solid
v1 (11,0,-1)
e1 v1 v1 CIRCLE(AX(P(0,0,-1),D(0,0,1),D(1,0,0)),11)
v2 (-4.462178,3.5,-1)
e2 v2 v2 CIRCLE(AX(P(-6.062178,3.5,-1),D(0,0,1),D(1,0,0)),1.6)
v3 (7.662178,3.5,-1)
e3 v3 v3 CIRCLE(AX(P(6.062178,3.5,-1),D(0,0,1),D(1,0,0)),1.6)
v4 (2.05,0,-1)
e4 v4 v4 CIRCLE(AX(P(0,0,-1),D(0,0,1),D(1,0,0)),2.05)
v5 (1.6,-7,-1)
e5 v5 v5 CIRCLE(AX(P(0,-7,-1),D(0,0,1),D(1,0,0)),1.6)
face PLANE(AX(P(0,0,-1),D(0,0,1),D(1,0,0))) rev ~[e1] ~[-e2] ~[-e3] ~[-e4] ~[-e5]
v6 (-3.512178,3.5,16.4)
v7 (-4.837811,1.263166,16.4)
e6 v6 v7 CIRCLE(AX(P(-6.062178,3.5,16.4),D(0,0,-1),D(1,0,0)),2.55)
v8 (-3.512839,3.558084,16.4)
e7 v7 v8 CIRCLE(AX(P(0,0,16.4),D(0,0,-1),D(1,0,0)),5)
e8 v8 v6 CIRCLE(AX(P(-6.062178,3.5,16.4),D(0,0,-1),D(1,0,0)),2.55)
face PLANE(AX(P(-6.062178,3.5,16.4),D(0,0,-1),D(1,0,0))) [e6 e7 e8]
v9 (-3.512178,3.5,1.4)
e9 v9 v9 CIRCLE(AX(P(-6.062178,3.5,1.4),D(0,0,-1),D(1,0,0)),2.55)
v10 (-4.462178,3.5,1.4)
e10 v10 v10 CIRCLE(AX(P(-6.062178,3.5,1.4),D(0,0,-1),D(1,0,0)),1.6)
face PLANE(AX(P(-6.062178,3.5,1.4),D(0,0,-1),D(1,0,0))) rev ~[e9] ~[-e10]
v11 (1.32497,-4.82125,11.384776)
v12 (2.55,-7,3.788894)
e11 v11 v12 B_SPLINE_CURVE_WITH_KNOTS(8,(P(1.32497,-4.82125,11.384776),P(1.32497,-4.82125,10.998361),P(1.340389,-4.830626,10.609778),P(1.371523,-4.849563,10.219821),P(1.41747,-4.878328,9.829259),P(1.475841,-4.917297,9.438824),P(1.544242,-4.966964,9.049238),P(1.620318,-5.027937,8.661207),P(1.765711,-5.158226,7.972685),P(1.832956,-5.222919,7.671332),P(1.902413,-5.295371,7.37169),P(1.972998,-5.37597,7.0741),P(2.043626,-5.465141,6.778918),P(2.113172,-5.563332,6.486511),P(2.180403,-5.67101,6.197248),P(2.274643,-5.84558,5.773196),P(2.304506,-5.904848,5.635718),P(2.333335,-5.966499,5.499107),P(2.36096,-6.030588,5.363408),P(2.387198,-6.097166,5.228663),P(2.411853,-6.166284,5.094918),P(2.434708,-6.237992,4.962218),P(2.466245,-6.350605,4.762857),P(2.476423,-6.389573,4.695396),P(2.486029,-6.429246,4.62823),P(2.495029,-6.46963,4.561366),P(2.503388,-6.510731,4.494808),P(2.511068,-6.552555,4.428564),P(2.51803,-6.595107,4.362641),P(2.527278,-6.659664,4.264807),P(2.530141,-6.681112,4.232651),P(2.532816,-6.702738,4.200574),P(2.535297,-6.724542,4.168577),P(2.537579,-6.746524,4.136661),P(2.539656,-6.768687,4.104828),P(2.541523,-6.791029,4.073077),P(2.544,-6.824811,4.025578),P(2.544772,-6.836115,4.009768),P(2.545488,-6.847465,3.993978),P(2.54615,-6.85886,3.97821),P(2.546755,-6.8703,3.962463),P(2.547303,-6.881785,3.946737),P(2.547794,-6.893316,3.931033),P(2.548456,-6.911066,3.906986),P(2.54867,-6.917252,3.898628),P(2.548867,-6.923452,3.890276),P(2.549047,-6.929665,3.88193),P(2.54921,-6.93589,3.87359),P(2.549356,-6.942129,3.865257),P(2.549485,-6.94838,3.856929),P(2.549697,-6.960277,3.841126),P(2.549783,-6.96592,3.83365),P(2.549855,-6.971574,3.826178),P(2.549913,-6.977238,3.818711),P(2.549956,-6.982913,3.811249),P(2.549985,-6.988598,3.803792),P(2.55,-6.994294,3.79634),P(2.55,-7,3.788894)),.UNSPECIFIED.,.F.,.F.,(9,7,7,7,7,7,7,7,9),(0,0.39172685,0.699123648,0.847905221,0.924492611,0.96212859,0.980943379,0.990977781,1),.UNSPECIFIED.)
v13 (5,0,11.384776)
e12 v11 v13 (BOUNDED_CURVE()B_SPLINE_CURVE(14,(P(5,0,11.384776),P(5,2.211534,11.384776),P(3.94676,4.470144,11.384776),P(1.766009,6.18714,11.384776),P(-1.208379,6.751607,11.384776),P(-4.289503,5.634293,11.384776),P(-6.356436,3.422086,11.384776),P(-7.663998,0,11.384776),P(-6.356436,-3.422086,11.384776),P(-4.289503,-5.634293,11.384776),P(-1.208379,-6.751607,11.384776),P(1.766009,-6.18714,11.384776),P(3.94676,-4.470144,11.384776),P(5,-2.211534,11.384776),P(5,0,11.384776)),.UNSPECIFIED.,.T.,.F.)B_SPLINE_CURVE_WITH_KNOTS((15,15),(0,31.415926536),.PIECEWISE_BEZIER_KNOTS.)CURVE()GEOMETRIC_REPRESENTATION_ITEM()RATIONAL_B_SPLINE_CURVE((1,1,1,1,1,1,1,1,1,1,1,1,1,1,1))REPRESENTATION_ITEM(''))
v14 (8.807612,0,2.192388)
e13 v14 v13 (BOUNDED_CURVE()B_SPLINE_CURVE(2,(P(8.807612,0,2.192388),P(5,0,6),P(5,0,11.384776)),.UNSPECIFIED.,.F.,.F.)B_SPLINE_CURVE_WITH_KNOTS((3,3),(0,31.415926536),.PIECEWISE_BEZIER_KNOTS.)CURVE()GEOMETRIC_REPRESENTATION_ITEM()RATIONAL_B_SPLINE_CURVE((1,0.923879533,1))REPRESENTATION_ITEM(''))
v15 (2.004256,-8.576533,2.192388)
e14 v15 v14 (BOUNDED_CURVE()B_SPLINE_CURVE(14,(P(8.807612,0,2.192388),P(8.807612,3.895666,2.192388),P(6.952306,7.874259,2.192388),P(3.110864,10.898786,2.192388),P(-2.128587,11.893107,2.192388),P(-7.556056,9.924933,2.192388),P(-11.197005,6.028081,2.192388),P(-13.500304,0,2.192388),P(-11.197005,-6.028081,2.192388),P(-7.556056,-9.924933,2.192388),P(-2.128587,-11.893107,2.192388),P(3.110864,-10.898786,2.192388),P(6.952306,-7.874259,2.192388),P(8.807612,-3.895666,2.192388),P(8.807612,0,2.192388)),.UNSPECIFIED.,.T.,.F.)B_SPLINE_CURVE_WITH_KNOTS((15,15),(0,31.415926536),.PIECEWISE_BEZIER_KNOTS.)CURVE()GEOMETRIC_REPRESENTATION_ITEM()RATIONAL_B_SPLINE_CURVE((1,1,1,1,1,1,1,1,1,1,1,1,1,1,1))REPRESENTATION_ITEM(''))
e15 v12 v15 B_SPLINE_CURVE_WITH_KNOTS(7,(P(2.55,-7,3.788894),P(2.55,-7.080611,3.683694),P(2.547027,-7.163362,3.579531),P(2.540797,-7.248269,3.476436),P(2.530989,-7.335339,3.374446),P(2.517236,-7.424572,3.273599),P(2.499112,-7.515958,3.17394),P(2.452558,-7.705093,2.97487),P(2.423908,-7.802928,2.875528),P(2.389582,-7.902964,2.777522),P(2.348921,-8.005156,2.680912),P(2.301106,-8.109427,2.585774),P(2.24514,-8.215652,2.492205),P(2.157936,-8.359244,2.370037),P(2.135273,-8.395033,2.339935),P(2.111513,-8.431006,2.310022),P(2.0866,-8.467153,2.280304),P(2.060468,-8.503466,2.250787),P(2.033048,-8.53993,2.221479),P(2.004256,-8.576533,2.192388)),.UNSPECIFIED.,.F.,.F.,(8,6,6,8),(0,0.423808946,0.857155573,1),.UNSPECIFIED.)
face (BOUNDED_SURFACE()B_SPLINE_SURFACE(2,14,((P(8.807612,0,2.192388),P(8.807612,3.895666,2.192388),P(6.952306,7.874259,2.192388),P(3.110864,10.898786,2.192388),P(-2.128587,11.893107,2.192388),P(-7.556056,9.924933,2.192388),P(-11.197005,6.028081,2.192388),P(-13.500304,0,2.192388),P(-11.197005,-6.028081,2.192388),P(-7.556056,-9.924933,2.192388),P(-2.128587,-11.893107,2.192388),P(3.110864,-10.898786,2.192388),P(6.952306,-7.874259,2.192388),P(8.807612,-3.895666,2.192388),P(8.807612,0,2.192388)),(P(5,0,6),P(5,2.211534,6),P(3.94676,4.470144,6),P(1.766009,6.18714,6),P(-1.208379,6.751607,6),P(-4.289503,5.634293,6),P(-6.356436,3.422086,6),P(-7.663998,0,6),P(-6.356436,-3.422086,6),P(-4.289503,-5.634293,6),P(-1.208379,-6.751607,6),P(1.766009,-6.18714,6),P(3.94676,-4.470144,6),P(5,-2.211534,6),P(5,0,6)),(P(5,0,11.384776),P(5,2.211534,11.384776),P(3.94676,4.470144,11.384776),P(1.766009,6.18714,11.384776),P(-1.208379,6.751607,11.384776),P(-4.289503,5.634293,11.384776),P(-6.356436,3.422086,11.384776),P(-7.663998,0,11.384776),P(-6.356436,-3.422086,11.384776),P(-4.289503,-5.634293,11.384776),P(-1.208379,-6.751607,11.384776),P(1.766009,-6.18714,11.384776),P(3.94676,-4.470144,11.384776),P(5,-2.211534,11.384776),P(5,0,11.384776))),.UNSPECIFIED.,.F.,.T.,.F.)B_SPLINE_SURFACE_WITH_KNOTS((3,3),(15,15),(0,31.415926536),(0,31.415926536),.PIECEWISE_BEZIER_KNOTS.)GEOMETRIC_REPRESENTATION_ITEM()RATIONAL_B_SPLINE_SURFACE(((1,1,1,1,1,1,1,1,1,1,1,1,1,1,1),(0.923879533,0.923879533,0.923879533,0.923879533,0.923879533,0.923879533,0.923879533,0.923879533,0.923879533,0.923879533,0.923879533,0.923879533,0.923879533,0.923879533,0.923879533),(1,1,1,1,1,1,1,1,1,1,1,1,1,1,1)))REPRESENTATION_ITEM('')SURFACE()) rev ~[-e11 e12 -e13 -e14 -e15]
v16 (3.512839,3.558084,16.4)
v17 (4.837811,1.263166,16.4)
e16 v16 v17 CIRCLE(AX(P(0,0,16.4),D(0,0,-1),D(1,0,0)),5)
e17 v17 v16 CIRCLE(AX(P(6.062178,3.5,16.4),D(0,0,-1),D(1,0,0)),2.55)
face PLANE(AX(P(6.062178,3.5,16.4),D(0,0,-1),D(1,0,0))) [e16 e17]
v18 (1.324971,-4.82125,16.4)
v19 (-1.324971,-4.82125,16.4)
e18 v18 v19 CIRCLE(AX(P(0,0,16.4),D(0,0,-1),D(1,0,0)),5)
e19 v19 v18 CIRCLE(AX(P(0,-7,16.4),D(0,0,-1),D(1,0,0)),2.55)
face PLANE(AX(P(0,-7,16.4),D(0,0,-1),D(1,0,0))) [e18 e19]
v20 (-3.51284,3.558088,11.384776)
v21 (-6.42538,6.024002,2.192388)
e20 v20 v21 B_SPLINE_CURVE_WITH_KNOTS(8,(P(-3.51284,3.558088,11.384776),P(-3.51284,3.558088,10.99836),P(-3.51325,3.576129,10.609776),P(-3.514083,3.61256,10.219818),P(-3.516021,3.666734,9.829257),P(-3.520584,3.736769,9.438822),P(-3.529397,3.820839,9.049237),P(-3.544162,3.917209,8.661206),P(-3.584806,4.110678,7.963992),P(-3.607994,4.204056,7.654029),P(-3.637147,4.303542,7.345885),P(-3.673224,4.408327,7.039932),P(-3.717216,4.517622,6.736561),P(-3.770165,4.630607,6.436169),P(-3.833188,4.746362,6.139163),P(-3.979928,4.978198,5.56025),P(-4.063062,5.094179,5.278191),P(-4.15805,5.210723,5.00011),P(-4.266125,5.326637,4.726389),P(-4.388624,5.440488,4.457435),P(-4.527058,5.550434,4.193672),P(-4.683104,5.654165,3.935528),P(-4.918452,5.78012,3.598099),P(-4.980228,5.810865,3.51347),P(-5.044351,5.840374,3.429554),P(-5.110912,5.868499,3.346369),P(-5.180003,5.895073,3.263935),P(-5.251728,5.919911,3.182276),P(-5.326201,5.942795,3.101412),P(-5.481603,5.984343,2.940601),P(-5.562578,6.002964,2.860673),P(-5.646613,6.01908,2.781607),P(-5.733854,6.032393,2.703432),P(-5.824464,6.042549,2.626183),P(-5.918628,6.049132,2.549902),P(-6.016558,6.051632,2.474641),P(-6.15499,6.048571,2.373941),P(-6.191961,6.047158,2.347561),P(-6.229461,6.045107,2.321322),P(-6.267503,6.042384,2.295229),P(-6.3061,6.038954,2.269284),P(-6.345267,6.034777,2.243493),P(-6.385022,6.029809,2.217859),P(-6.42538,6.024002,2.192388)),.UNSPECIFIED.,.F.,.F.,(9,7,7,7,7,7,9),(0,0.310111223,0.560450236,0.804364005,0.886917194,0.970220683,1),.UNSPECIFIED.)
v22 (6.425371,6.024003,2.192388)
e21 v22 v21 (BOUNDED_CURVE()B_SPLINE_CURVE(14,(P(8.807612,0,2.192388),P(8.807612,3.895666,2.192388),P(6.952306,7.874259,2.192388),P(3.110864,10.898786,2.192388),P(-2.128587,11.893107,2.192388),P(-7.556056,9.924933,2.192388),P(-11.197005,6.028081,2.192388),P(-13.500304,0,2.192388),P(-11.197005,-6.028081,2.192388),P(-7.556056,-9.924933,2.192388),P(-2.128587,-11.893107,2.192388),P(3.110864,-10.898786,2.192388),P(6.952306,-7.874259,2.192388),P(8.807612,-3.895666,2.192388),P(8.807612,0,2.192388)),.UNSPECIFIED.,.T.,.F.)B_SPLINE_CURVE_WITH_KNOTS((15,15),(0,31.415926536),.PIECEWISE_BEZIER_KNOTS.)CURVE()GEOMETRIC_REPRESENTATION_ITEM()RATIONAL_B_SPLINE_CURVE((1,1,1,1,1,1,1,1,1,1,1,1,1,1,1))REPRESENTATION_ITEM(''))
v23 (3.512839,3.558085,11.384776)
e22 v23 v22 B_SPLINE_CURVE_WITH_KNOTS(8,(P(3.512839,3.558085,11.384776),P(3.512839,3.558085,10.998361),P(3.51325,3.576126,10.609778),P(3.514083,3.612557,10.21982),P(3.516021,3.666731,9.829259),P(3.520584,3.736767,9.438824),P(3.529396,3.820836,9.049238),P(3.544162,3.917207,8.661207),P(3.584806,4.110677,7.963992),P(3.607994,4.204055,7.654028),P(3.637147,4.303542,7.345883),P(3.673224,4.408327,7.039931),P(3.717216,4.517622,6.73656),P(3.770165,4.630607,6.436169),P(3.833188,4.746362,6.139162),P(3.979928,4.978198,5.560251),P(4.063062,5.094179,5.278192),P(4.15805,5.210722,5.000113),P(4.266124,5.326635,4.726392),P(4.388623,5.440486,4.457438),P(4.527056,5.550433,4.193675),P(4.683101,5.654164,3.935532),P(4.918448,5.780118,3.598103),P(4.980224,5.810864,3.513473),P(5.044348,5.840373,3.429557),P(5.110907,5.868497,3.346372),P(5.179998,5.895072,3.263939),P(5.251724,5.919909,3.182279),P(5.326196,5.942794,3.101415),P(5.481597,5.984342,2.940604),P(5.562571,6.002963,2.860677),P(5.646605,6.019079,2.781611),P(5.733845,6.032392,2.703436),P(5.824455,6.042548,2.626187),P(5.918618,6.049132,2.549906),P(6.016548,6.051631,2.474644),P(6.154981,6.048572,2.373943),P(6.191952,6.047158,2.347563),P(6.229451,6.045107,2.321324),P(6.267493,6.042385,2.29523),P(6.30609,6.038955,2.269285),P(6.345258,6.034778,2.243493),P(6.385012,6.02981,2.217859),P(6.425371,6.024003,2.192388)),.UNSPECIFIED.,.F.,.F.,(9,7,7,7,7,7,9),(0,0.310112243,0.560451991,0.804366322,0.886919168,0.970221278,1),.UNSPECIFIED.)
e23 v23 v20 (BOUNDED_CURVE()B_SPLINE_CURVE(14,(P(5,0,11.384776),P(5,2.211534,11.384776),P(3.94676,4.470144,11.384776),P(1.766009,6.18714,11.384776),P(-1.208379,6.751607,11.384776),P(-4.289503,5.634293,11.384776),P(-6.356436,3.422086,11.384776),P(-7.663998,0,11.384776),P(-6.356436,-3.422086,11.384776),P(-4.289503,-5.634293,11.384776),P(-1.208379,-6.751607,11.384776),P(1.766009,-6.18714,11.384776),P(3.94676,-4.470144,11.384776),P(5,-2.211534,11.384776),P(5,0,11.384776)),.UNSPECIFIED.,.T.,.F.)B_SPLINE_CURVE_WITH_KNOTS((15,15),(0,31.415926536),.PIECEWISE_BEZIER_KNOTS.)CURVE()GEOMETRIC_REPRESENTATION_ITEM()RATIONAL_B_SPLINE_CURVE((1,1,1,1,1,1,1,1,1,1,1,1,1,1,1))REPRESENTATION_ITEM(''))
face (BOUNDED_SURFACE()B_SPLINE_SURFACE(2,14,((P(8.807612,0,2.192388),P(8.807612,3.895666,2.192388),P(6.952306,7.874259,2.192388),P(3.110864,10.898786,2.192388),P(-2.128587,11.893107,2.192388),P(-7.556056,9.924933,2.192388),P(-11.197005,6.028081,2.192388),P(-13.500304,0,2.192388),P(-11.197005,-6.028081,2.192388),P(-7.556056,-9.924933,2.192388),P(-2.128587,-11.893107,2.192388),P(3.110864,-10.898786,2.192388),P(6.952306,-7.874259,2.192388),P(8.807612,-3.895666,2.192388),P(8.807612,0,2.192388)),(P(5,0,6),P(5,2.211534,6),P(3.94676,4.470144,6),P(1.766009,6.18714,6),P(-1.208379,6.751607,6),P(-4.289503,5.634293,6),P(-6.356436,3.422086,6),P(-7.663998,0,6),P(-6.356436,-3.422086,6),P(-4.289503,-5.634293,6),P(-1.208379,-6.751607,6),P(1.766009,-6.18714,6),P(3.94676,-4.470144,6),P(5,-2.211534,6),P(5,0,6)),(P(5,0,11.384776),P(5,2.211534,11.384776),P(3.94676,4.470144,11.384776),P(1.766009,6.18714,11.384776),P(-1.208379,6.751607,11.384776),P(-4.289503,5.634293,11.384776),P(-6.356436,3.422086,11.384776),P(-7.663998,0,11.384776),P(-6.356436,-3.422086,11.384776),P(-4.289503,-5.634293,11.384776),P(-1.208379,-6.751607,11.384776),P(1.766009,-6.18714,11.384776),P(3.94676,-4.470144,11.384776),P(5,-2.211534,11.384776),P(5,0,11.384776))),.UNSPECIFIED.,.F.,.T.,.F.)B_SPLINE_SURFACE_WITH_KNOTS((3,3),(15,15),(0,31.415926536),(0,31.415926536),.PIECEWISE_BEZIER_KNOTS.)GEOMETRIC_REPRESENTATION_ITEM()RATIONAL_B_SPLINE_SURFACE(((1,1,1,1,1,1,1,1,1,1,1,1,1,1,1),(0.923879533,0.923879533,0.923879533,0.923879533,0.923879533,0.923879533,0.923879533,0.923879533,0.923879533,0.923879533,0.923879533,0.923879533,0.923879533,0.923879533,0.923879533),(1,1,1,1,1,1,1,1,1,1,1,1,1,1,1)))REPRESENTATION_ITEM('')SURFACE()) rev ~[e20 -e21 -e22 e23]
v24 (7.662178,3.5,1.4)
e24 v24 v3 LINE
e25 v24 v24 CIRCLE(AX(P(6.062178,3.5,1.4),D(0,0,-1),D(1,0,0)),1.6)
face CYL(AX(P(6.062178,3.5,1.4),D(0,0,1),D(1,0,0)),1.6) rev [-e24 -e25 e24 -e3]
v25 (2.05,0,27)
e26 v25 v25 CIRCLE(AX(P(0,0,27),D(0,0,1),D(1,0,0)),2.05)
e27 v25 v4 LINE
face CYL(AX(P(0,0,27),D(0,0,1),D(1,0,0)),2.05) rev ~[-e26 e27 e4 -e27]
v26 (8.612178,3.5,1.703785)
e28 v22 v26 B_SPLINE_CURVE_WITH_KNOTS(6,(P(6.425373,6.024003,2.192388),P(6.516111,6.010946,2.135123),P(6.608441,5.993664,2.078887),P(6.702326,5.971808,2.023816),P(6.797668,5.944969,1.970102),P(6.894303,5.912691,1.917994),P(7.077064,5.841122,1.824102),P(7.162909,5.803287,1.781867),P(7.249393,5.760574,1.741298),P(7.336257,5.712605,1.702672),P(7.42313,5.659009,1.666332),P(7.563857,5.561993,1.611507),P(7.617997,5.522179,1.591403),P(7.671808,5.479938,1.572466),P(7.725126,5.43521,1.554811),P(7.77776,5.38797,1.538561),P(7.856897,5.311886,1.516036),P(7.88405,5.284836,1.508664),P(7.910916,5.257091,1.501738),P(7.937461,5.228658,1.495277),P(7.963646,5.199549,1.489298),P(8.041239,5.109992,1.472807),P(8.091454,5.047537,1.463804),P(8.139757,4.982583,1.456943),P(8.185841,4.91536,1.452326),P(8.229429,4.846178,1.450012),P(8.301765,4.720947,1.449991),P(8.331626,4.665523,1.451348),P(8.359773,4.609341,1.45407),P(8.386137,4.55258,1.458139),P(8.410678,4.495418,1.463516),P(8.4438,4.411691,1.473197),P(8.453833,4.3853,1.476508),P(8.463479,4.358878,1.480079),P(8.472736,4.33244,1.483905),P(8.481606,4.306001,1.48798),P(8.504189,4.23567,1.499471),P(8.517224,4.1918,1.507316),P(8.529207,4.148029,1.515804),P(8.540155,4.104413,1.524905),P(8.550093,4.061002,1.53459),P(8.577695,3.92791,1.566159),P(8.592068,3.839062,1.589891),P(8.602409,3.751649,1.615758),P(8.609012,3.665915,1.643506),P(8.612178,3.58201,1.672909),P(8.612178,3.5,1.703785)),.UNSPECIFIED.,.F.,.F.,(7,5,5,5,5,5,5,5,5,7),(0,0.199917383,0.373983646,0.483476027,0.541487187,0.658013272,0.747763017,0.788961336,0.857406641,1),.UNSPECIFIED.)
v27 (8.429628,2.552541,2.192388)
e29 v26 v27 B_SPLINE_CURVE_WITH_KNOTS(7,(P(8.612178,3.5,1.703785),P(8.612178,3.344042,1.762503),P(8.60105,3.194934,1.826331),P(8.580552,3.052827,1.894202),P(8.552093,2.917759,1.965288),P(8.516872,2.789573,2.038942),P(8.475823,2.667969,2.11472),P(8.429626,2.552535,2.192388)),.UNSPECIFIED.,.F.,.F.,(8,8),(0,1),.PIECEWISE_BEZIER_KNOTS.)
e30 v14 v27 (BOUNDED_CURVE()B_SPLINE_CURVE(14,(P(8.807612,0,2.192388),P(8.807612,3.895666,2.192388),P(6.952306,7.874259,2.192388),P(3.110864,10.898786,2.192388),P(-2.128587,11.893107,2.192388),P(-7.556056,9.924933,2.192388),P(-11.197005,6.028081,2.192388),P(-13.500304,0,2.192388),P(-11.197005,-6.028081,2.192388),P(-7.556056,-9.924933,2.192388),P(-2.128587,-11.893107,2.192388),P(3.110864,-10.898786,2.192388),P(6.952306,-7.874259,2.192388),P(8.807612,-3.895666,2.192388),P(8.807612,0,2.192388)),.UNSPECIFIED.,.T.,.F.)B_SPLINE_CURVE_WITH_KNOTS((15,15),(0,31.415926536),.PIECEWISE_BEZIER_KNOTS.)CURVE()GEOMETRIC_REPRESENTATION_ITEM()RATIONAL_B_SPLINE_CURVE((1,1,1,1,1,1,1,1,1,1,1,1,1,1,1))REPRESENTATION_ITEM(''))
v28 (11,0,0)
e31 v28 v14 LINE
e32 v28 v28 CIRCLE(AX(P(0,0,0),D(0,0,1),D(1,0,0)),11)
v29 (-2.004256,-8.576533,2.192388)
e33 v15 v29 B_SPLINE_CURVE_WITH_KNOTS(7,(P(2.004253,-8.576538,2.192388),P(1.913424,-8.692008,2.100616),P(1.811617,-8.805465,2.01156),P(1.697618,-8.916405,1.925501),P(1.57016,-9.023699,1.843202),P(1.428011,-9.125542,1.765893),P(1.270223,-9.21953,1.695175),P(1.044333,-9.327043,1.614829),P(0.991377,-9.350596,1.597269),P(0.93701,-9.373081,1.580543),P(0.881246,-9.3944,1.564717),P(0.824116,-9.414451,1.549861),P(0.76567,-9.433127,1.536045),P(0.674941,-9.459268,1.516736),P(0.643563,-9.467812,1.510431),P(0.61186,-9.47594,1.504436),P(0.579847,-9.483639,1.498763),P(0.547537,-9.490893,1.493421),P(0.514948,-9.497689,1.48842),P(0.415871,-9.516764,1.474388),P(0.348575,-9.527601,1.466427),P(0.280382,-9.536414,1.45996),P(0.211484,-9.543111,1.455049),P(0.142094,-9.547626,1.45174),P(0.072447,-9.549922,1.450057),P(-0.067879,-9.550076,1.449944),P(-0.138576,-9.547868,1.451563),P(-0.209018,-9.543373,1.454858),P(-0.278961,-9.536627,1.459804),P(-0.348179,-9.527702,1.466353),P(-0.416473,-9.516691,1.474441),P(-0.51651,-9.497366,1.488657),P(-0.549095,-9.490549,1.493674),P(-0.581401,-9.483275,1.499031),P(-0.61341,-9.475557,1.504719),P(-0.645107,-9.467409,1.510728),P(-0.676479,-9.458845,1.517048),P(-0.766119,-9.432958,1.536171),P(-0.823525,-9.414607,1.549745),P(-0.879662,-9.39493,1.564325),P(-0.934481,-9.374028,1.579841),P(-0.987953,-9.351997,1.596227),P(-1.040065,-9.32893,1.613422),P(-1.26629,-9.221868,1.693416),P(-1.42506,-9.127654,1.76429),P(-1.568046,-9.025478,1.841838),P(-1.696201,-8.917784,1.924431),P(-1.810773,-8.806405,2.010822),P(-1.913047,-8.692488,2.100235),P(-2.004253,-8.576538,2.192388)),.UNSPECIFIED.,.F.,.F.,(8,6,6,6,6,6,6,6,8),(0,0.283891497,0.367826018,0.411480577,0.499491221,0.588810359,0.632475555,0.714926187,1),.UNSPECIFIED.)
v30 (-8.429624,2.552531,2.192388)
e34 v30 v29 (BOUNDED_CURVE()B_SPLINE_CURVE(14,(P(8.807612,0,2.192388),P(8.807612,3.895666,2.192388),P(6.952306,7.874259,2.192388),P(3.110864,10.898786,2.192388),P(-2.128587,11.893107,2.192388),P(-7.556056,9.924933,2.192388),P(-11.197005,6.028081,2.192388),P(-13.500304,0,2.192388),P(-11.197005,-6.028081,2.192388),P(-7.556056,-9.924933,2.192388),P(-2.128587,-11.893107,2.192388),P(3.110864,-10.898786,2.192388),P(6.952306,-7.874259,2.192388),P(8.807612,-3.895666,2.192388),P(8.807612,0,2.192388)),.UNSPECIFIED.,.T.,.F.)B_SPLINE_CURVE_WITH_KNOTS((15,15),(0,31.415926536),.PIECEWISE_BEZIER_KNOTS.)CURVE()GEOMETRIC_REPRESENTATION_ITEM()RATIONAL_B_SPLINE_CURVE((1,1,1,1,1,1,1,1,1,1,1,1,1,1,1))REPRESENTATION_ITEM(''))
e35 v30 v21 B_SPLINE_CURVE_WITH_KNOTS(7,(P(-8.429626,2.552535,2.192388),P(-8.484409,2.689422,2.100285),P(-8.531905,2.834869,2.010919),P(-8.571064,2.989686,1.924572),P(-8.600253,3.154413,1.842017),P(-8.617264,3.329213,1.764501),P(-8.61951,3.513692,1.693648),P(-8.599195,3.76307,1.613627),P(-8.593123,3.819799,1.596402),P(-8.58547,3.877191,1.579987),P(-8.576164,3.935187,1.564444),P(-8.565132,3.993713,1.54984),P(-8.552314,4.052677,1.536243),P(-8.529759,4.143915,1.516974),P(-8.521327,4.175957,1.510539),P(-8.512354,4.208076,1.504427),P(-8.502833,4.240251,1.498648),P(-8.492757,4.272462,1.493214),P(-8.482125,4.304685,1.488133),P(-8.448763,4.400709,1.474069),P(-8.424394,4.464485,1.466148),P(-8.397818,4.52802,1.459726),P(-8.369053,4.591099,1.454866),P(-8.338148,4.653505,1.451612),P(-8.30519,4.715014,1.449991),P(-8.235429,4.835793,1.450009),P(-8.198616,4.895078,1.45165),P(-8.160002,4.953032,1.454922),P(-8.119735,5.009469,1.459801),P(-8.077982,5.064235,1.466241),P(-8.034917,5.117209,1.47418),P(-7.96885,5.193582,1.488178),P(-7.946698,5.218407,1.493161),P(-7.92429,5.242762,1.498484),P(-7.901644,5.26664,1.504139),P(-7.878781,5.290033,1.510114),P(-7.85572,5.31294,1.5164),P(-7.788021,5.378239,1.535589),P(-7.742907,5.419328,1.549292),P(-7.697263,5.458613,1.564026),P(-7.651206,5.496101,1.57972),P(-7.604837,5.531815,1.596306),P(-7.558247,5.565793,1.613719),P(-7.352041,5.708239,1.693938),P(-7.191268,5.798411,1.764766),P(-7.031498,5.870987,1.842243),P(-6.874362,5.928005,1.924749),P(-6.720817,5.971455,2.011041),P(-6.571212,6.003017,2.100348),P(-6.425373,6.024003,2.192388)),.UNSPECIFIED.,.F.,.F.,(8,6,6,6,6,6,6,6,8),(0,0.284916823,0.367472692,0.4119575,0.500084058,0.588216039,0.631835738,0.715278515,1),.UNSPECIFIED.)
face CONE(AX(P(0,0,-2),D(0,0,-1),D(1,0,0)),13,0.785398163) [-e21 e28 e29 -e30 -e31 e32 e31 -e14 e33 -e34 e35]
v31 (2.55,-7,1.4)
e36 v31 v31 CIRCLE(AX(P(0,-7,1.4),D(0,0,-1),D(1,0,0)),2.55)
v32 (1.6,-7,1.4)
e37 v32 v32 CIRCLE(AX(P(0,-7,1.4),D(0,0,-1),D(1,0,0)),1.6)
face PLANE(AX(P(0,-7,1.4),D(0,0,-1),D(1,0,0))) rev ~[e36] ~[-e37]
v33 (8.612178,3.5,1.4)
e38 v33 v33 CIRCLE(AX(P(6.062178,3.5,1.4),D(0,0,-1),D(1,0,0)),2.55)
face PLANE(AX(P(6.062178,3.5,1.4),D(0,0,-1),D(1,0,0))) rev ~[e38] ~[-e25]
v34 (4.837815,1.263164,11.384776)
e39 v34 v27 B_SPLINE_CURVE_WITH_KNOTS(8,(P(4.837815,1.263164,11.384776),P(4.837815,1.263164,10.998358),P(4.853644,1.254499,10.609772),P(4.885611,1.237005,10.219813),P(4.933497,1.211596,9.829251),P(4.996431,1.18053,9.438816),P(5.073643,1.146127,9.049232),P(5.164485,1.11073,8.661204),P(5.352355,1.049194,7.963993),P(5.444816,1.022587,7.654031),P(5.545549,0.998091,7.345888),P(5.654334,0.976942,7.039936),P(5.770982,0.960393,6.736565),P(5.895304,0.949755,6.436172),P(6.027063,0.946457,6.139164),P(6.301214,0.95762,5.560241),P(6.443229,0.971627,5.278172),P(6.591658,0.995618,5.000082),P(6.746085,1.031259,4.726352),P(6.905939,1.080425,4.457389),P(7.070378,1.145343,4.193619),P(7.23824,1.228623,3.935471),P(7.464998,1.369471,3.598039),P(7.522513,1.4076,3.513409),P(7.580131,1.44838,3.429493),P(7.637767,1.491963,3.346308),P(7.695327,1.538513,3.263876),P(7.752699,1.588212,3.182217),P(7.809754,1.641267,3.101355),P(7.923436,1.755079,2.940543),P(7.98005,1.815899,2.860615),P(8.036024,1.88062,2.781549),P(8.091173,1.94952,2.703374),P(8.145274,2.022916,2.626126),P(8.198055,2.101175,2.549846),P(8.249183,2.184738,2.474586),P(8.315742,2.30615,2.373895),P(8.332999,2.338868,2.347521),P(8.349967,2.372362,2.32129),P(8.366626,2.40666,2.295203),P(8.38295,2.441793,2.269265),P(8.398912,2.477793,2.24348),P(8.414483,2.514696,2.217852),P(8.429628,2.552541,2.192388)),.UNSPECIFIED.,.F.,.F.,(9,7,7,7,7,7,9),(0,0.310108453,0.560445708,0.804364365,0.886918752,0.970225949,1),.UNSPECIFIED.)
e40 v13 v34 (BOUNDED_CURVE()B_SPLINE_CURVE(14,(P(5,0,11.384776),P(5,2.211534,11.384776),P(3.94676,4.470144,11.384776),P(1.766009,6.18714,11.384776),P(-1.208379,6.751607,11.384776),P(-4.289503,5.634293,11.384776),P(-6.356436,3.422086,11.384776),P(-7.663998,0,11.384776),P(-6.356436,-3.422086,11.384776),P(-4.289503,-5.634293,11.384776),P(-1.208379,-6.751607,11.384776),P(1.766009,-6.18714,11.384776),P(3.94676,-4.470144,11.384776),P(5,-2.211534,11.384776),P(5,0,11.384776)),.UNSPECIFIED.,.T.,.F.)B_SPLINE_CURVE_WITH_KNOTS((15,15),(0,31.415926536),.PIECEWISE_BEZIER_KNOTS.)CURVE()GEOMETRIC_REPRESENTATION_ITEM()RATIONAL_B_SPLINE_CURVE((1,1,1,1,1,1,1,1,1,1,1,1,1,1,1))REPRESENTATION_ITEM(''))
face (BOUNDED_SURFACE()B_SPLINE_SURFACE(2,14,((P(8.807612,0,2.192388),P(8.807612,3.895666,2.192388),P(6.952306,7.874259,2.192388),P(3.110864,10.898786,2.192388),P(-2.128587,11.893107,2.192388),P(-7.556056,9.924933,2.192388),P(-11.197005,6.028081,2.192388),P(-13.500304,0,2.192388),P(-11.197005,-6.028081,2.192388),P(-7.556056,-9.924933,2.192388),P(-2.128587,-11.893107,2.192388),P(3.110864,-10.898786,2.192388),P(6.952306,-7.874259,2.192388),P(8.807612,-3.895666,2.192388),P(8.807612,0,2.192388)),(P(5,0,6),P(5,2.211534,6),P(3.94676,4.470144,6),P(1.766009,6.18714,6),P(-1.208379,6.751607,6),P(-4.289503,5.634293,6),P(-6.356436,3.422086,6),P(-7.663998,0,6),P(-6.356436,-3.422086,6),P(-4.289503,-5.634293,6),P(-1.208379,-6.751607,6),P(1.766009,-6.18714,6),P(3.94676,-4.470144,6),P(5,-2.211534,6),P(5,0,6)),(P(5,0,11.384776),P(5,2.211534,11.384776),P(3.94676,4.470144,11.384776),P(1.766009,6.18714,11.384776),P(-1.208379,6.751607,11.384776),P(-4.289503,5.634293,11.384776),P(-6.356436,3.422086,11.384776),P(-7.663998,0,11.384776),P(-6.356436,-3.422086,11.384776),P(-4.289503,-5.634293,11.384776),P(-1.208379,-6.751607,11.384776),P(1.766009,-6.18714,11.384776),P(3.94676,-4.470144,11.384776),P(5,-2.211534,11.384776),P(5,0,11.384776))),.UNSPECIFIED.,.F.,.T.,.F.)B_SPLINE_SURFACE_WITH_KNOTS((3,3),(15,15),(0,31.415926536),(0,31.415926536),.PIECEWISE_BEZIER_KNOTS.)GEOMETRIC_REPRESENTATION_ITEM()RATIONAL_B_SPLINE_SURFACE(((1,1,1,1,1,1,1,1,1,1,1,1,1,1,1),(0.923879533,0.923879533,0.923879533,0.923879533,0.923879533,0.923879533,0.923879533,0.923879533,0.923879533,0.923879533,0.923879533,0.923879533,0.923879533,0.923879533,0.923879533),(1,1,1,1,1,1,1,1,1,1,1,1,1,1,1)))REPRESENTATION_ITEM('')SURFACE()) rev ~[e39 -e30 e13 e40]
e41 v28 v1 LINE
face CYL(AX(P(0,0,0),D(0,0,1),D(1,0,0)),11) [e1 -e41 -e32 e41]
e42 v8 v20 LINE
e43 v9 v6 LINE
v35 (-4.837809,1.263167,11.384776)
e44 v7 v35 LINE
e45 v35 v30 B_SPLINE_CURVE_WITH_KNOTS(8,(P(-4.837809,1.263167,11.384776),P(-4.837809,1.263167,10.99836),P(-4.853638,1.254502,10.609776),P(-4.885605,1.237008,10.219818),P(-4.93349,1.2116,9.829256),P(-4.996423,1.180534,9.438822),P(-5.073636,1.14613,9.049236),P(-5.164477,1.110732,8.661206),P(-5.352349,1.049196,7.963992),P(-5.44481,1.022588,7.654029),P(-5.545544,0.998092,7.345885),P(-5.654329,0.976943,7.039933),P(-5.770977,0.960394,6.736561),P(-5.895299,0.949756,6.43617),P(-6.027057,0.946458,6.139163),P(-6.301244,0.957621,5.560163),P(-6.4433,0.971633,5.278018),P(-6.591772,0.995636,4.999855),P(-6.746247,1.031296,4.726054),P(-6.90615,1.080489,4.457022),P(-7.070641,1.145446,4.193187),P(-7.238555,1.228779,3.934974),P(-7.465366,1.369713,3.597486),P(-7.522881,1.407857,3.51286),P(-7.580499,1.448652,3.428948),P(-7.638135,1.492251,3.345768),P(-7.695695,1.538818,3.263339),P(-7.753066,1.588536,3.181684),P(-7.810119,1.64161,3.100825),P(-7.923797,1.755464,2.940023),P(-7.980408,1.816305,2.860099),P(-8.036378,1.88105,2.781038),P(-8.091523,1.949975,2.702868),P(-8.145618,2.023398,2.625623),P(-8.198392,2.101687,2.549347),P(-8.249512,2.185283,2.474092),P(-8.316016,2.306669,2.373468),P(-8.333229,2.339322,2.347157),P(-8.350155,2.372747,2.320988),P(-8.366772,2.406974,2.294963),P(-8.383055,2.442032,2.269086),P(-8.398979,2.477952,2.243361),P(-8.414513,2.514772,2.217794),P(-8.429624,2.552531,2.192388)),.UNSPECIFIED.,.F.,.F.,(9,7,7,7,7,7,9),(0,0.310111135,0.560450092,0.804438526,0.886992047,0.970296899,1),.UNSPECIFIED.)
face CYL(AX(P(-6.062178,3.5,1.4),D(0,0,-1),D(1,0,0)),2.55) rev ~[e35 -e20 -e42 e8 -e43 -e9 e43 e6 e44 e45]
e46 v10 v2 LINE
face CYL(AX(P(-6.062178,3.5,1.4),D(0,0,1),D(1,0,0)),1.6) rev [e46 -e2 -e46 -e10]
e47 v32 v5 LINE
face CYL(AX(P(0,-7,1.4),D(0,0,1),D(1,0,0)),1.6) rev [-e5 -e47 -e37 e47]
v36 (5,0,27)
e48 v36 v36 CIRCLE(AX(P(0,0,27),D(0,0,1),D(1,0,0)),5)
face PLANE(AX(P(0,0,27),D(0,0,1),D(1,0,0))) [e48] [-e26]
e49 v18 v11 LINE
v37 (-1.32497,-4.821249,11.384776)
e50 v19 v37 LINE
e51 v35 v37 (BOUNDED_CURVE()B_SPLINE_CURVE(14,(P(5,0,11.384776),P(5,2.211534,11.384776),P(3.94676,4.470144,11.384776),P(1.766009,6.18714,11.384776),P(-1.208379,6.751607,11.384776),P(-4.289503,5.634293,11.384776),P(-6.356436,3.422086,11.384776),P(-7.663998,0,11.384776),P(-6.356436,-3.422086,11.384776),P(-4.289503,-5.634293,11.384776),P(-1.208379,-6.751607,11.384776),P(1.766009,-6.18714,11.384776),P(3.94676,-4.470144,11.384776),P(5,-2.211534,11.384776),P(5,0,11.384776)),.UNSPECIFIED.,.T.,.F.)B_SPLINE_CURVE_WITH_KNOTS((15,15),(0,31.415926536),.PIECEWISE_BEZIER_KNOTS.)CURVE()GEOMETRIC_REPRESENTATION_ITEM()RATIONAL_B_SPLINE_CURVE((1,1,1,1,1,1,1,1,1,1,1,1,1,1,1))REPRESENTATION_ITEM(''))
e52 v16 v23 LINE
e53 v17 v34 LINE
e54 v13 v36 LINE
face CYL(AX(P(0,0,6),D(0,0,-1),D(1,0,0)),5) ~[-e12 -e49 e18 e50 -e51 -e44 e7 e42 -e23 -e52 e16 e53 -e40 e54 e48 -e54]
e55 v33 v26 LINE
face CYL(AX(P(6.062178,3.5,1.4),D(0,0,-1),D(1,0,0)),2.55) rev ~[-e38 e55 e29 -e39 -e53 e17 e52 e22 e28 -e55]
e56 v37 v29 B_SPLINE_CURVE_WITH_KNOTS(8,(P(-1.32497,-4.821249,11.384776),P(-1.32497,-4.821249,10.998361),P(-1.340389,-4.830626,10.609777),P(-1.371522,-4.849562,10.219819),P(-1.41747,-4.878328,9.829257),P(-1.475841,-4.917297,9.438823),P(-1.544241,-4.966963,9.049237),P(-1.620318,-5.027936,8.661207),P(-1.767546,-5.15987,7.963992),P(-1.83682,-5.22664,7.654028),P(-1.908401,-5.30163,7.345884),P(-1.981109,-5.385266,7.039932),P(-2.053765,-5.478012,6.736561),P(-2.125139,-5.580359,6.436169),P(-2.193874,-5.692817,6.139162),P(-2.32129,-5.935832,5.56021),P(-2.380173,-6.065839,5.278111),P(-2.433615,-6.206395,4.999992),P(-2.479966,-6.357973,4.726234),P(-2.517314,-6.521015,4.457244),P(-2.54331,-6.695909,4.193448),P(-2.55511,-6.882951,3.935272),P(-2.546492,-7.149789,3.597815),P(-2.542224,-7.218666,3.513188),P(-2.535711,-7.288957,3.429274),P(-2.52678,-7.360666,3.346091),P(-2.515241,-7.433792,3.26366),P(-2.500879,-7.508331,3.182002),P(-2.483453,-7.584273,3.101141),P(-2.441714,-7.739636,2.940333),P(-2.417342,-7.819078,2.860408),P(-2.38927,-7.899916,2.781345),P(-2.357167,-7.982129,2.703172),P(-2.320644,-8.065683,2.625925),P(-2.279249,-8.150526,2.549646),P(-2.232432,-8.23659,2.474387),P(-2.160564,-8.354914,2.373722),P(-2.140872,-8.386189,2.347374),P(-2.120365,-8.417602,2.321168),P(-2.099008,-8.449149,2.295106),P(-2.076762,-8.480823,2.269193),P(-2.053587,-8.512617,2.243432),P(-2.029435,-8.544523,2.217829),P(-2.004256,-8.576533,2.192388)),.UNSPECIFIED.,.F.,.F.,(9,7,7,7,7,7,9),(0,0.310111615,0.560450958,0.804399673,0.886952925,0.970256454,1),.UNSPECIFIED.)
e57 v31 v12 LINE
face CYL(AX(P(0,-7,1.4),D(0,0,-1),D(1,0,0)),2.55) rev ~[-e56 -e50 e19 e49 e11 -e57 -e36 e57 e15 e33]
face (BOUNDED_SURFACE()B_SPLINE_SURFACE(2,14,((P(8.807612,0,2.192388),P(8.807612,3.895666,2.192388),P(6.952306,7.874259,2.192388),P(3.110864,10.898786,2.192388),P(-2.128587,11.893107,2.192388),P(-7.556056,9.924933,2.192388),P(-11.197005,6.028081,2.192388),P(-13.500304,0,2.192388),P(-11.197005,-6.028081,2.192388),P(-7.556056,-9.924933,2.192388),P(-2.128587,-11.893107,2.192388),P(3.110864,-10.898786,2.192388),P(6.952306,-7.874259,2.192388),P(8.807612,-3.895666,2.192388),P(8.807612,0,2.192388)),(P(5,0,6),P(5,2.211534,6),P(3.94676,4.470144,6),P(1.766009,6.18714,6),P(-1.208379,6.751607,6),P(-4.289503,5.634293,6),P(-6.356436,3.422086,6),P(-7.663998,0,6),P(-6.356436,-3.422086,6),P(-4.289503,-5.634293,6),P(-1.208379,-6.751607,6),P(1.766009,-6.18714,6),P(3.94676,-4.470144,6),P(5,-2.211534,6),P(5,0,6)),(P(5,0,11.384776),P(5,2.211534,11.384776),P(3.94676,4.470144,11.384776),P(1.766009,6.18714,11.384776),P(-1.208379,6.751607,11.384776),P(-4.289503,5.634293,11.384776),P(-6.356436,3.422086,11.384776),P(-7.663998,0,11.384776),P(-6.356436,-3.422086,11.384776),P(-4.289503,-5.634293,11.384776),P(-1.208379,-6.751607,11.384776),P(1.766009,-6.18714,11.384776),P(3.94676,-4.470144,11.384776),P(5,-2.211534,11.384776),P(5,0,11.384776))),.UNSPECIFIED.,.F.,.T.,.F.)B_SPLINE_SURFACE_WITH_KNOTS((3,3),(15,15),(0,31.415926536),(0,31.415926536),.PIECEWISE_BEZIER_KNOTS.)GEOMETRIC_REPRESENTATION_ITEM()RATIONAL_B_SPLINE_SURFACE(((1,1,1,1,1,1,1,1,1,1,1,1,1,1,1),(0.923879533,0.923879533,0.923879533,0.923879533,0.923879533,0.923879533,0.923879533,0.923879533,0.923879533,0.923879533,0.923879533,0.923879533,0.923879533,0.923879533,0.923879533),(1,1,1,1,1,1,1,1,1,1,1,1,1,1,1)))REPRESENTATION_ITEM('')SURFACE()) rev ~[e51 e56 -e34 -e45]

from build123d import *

# Parameters (mm, degrees)
F0_R        = 13
F1_DEPTH    = 6
F2_R        = 5
F3_DEPTH    = 21
F4_S5_R     = 5
F4_T6_DEPTH = 20
F5_R        = 13
F6_DEPTH    = 1
F8_R        = 1.6
F9_DEPTH    = 25
F10_R       = 2.55
F11_DEPTH   = 15
F12_R       = 2.05
F13_DEPTH   = 30


# Not quite as in the source:
# - a fillet or chamfer that OpenCascade refuses, or shapes differently, is made with other operations: its cross-section is extruded or revolved along the edge and cut away or added


with BuildPart() as f1:
    # F0 (on Top) → F1 (new body)
    with BuildSketch(Plane.XY):
        Circle(F0_R)
    extrude(amount=F1_DEPTH)

    # F2 (on face) → F3 (join)
    with BuildSketch(Plane.XY.offset(6)):
        Circle(F2_R)
    extrude(amount=F3_DEPTH)

    # F4: chamfer of 8 on 1 edges, made by hand


with BuildPart() as f4_tool2:
    # F4_s3 → F4_t4 (revolve)
    with BuildSketch(Plane.XZ):
        Polygon((13, -2), (5, 6), (13, 6), align=None)
    revolve(axis=Axis((0, 0, 6), (0, 0, 1)))

    # F4_s5 → F4_t6 (cut, symmetric)
    with BuildSketch(Plane.XY.offset(2)):
        Circle(F4_S5_R)
    extrude(amount=F4_T6_DEPTH, both=True, mode=Mode.SUBTRACT)


with BuildPart() as f1_1:
    add(f1.part)

    # F4_t1: cut F4_tool2
    add(f4_tool2.part, mode=Mode.SUBTRACT)

    # F5
    f5_edges = [f1_1.edges().sort_by_distance(p)[0] for p in [
        (-5, 0, 6),
    ]]
    fillet(f5_edges, radius=F5_R)

    # F6 (add): a face of the model
    f6_faces = [f1_1.faces().sort_by_distance(p)[0] for p in [
        (0, 0, 0),
    ]]
    extrude(f6_faces, amount=F6_DEPTH)

    # F8 (on offset) → F9 (cut)
    with BuildSketch(Plane(origin=(0, 0, 1.4), x_dir=(1, 0, 0), z_dir=(0, 0, -1))):
        with Locations((6.0621778265, -3.5)):
            Circle(F8_R)
        with Locations((0, 7)):
            Circle(F8_R)
        with Locations((-6.0621778265, -3.5)):
            Circle(F8_R)
    extrude(amount=F9_DEPTH, mode=Mode.SUBTRACT)

    # F10 (on offset) → F11 (cut)
    with BuildSketch(Plane(origin=(0, 0, 1.4), x_dir=(1, 0, 0), z_dir=(0, 0, -1))):
        with Locations((0, 7)):
            Circle(F10_R)
        with Locations((6.0621778265, -3.5)):
            Circle(F10_R)
        with Locations((-6.0621778265, -3.5)):
            Circle(F10_R)
    extrude(amount=-F11_DEPTH, mode=Mode.SUBTRACT)

    # F12 (on face) → F13 (cut)
    with BuildSketch(Plane.XY.offset(27)):
        Circle(F12_R)
    extrude(amount=-F13_DEPTH, mode=Mode.SUBTRACT)


solid = f1_1.part
